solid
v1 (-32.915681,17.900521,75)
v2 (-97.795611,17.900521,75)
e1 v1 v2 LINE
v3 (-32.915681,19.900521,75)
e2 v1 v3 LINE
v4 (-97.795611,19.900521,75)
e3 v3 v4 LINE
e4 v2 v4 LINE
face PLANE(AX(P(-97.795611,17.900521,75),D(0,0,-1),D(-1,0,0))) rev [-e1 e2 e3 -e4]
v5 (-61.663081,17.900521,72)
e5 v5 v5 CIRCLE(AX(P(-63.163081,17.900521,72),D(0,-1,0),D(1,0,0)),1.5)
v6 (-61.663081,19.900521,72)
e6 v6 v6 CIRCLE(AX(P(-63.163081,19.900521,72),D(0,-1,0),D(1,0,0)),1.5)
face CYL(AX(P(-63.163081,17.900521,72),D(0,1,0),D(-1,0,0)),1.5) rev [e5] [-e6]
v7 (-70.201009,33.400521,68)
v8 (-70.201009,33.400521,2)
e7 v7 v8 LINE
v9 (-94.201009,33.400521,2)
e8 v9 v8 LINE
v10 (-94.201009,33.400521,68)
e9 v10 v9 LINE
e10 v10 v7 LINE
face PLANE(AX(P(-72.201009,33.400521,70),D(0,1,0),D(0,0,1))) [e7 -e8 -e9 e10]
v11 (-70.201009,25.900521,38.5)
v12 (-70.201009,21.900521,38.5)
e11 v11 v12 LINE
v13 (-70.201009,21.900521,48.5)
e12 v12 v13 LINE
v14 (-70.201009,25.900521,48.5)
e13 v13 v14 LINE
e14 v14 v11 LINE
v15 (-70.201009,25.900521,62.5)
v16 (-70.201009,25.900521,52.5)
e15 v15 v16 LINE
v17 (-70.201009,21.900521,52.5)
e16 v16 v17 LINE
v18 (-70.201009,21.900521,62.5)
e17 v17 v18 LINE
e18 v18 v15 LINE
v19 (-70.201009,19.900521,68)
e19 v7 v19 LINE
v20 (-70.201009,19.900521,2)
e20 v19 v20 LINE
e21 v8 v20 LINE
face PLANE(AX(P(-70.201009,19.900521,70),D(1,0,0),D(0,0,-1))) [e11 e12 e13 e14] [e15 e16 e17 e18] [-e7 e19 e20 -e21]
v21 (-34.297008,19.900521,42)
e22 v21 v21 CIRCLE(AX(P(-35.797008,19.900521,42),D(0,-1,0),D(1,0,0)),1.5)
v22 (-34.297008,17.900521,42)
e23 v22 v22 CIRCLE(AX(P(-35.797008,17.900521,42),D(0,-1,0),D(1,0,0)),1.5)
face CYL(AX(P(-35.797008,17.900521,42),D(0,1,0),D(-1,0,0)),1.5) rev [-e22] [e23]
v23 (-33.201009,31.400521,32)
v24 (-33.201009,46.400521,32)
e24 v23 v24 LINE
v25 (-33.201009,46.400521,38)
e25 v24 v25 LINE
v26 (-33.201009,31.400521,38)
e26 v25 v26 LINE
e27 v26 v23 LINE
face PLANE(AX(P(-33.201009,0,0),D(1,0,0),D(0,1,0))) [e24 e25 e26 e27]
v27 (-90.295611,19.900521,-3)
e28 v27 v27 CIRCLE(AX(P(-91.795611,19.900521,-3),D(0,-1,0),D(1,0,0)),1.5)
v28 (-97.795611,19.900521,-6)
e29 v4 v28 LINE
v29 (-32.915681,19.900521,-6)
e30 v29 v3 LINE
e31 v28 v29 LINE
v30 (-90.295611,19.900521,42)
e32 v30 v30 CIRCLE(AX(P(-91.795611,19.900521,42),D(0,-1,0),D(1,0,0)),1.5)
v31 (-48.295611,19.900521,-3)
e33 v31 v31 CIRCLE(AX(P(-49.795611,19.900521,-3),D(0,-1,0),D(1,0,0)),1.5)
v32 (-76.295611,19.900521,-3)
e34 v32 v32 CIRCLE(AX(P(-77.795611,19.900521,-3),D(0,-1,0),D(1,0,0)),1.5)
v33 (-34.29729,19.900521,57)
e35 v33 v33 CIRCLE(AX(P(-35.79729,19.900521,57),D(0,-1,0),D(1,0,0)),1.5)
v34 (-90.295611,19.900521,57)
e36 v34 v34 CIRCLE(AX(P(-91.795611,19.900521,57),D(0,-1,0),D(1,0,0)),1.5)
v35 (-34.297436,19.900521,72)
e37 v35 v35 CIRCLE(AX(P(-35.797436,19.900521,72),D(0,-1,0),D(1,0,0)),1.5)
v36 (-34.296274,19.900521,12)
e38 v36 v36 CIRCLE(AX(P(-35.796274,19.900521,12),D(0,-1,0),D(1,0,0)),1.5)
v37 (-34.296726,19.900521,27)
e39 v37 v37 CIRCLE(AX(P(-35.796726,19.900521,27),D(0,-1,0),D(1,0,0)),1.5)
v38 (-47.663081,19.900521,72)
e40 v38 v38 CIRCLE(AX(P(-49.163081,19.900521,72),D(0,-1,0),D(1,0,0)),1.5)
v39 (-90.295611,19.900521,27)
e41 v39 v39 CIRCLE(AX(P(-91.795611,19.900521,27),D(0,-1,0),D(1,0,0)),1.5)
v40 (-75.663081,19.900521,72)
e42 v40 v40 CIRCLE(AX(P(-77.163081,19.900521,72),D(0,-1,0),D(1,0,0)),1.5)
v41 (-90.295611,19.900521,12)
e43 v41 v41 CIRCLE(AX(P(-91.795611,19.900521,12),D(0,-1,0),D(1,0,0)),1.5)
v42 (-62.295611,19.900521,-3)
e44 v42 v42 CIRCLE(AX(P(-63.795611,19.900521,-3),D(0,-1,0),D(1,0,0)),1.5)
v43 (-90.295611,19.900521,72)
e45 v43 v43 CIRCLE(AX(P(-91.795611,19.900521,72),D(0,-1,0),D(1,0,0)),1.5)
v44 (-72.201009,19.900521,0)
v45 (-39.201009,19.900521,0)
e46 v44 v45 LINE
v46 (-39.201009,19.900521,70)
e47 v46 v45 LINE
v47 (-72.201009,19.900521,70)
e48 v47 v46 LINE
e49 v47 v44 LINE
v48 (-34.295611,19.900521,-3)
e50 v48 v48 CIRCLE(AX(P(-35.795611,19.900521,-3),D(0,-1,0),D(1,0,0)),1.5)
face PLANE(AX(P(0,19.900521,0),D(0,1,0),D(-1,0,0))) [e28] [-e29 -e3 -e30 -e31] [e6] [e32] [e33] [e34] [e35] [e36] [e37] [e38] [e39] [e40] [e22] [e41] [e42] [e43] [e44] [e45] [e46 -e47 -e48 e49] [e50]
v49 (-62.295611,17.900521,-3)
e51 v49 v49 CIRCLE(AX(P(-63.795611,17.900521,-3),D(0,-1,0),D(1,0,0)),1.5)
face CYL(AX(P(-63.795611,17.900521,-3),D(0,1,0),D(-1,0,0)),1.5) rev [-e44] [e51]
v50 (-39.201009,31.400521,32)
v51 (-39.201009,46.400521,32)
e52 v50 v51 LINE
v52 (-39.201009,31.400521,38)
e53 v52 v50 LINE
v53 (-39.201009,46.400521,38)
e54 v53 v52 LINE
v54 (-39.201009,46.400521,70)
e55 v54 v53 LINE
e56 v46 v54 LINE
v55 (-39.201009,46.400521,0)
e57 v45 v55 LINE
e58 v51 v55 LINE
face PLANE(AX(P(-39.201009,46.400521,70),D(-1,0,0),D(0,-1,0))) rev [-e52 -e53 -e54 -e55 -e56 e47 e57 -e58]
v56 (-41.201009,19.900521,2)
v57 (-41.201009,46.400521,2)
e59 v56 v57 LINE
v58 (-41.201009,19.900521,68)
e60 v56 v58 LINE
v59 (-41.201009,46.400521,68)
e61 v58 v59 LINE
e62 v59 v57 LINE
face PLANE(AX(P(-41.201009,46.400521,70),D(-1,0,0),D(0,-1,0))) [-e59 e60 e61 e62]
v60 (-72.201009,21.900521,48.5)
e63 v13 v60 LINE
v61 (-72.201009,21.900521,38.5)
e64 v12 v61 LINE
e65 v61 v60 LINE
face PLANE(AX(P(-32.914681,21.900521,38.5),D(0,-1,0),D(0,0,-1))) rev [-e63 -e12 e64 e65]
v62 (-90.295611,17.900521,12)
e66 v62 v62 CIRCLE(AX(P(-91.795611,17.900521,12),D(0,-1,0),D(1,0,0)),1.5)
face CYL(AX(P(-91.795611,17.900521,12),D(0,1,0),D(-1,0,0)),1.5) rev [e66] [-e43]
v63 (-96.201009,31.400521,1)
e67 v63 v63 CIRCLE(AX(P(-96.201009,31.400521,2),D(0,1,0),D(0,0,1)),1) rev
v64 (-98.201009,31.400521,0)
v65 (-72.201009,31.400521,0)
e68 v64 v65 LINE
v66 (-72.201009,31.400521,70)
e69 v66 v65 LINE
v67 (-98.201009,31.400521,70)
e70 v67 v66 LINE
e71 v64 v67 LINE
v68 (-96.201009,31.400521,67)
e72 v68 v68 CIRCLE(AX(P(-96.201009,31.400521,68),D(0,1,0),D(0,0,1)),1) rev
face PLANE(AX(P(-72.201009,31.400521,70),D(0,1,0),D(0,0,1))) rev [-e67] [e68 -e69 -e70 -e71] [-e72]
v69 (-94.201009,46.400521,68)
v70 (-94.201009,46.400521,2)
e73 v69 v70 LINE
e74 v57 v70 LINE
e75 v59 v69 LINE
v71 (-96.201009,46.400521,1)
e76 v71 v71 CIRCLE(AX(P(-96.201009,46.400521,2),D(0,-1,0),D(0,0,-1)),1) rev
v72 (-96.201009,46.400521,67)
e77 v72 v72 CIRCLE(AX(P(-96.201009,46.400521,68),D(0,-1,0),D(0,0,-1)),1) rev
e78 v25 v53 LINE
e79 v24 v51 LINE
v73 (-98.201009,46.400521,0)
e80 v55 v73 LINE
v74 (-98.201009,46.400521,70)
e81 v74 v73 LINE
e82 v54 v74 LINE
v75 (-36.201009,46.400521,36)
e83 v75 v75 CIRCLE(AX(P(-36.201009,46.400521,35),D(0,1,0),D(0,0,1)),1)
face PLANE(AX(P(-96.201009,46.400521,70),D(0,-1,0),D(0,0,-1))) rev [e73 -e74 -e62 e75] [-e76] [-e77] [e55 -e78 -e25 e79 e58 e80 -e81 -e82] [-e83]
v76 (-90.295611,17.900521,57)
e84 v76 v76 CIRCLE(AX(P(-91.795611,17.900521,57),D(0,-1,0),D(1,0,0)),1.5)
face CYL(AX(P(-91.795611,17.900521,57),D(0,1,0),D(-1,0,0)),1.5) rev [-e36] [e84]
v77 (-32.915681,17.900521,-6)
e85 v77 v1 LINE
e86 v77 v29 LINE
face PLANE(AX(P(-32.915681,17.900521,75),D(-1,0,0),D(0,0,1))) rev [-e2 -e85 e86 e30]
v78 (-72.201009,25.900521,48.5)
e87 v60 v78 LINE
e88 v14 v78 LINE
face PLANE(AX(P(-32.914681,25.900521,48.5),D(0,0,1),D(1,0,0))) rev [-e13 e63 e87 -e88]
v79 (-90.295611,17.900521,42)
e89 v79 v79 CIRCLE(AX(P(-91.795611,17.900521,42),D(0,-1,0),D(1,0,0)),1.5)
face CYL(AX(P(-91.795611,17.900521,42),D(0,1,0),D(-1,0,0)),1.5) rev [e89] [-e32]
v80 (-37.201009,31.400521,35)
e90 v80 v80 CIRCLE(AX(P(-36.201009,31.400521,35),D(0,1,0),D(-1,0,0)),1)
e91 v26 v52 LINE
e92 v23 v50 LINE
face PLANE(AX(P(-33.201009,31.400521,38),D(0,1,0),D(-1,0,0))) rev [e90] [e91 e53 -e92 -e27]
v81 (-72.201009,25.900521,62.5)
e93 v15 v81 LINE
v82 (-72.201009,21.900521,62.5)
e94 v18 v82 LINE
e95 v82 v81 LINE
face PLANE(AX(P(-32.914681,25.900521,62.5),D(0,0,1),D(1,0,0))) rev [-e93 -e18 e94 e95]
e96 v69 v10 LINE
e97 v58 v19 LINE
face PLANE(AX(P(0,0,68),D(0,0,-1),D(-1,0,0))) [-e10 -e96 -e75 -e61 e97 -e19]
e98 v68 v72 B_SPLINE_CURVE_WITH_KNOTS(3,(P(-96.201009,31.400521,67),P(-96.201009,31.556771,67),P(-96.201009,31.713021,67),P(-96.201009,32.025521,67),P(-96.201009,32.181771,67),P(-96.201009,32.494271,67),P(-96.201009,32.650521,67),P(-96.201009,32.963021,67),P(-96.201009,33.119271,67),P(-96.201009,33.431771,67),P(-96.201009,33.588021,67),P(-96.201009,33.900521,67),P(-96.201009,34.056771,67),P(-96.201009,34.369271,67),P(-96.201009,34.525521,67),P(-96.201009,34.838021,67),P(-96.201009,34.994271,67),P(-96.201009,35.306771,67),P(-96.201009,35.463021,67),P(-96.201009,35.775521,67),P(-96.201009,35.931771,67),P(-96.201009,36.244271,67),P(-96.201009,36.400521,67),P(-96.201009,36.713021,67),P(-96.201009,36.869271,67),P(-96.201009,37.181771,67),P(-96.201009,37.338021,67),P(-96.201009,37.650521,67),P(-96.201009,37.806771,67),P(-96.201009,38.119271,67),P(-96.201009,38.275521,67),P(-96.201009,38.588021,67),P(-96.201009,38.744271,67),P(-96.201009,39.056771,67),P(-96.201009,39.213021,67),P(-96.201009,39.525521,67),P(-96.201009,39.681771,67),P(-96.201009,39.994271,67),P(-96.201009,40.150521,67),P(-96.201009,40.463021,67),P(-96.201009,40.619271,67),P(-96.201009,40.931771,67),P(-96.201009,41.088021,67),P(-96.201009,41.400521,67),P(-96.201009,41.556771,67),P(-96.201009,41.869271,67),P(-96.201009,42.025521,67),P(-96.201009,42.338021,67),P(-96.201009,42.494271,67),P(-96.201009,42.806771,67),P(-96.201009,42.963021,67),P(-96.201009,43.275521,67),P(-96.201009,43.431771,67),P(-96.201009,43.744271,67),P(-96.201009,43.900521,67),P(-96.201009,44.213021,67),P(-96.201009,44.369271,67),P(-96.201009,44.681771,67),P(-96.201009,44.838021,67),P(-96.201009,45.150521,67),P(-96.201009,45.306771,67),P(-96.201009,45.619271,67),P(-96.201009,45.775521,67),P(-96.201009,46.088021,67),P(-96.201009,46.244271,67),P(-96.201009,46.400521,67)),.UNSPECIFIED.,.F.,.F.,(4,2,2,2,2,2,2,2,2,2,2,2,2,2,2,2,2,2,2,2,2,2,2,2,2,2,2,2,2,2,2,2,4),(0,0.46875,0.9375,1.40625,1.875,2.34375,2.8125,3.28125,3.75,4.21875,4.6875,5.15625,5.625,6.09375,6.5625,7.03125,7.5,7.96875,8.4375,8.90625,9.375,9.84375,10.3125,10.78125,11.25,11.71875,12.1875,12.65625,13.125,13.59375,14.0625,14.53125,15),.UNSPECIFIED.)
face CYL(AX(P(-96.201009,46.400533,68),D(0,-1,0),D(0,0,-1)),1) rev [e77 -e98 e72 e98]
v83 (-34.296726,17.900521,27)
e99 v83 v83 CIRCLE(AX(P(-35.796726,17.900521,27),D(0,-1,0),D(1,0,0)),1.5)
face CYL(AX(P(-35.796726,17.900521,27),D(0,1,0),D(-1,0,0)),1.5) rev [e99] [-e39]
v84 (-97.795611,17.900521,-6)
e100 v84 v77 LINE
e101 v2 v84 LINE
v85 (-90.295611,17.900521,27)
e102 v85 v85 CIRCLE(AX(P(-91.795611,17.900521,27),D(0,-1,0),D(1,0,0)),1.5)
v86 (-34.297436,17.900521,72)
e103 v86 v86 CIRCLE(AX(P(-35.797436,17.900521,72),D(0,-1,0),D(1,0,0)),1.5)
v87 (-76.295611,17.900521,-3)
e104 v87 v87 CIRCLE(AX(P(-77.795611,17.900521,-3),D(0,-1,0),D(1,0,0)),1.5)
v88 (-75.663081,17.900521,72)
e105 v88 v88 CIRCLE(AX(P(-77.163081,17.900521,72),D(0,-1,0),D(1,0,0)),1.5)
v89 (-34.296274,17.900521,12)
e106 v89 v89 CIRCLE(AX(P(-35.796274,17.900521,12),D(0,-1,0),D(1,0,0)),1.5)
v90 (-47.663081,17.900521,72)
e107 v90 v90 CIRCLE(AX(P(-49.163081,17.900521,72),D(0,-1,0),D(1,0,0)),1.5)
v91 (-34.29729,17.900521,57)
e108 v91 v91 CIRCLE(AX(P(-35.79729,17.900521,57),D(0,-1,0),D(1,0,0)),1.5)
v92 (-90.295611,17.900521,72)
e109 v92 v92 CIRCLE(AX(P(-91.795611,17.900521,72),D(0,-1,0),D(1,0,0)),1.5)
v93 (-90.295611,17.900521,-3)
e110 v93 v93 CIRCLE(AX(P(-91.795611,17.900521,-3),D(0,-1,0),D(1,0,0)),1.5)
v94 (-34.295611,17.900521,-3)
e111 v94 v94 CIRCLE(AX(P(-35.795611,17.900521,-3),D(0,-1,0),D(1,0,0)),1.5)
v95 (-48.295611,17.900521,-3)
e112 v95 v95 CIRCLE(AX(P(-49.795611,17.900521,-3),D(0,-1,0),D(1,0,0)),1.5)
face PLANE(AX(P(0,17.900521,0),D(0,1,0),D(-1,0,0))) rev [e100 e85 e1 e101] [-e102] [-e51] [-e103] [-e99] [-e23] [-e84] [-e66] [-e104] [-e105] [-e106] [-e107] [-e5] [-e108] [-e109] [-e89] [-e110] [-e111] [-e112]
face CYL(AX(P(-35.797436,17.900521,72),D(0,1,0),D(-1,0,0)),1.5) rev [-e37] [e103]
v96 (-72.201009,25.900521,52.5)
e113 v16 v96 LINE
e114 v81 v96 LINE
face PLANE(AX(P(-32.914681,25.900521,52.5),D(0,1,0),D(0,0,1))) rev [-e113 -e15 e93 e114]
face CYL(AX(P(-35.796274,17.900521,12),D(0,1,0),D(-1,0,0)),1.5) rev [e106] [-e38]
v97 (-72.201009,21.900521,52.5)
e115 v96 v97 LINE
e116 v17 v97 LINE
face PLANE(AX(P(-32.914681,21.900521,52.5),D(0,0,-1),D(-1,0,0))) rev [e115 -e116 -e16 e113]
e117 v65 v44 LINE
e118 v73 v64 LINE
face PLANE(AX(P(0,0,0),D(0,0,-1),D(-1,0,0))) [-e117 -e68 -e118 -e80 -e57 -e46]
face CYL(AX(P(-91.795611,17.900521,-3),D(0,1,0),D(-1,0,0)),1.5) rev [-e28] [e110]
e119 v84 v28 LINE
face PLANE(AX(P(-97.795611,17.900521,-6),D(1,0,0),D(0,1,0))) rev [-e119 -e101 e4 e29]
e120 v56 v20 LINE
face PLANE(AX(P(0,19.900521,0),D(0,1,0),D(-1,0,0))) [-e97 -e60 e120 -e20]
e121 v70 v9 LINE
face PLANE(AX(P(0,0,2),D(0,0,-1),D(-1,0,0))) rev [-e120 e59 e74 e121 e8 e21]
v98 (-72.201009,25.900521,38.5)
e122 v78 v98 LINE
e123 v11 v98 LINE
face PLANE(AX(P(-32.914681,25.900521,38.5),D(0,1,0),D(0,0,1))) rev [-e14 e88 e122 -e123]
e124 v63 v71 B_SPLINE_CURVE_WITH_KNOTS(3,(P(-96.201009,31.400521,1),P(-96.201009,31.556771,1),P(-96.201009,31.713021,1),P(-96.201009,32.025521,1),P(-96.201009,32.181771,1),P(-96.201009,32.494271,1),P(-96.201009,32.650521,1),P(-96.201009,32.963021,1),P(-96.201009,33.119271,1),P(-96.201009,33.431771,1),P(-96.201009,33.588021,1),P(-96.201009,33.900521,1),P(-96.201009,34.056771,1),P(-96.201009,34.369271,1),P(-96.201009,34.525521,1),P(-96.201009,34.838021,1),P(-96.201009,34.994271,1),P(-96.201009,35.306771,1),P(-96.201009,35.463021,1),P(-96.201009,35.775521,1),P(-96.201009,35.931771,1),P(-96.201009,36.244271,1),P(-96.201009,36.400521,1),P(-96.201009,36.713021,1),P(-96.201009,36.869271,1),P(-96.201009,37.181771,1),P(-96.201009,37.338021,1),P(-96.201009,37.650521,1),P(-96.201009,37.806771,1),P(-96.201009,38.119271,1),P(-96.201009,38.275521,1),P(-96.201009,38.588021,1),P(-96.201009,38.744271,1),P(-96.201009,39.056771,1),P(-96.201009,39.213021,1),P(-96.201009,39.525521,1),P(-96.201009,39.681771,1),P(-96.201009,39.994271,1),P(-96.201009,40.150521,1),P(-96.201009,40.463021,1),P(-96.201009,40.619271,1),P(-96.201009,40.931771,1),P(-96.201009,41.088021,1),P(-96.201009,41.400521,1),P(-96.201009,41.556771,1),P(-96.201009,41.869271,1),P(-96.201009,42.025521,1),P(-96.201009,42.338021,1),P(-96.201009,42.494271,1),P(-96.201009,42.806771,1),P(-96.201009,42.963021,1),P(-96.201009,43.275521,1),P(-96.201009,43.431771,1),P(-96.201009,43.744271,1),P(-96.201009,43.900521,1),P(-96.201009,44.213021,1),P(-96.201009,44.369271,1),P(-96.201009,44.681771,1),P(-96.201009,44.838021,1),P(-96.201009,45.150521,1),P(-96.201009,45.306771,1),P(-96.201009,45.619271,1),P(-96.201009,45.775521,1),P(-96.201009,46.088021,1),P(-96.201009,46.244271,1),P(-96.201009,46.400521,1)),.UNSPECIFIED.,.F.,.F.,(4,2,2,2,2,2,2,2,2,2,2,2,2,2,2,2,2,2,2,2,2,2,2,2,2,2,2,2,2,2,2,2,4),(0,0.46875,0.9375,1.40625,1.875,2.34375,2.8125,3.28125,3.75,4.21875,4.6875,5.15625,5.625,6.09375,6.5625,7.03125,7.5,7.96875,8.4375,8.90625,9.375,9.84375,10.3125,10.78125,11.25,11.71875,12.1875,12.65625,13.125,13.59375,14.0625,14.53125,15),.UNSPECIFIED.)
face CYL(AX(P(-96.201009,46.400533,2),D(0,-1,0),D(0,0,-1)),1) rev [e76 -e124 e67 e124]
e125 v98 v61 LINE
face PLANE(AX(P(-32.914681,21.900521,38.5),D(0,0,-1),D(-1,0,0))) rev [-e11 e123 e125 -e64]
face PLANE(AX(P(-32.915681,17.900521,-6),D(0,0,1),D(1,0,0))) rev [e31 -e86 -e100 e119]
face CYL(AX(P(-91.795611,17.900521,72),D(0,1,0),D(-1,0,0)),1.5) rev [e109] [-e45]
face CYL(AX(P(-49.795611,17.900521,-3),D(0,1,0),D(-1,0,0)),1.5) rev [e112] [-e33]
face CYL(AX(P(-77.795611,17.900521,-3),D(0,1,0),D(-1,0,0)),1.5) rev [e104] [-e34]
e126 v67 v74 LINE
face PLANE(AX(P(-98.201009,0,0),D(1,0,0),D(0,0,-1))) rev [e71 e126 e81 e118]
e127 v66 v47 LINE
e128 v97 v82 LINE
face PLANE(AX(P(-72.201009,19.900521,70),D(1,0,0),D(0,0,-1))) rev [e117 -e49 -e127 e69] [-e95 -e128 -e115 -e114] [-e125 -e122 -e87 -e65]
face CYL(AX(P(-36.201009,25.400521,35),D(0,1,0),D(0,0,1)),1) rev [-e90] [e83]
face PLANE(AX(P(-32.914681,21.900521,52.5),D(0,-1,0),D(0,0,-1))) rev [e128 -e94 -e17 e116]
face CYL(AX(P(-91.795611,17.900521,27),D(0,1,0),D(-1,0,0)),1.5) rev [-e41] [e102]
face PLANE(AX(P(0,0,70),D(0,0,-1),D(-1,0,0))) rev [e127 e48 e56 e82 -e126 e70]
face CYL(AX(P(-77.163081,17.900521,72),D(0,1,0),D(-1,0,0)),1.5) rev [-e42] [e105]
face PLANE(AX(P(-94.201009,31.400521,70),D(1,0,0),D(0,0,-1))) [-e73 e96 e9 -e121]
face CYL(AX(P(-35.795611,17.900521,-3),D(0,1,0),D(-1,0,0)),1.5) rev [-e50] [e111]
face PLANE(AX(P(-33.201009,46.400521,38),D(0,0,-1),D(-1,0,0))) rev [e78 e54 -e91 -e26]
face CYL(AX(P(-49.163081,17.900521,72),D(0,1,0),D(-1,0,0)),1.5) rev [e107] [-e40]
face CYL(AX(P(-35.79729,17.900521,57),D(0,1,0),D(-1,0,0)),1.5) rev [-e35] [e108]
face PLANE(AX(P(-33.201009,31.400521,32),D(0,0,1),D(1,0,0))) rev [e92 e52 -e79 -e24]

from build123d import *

# Parameters (mm, degrees)
BOSS_EXTRU_1_DEPTH                  = 70
ESQUISSE2_W                         = 64.879929842
ESQUISSE2_H                         = 80.999999972
ESQUISSE2_R                         = 1.499999992
ESQUISSE2_R_2                       = 1.499999996
ESQUISSE2_R_3                       = 1.499999991
ESQUISSE2_R_4                       = 1.499999993
ESQUISSE2_R_5                       = 1.499999999
ESQUISSE2_R_6                       = 1.5
BOSS_EXTRU_2_DEPTH                  = 2
COQUE1_START                        = 19.900521193
COQUE1_OUTLINE_W                    = 29
COQUE1_OUTLINE_H                    = 66
COQUE1_DEPTH                        = 26.5
COQUE1_START_2                      = 33.400521193
COQUE1_2_OUTLINE_W                  = 24
COQUE1_2_OUTLINE_H                  = 66
COQUE1_2_DEPTH                      = 13
ENL_V_MAT_EXTRU_1_REACH             = 98.547
ESQUISSE4_W                         = 10
ESQUISSE4_H                         = 4
ENL_V_MAT_EXTRU_2_REACH             = 98.547
ESQUISSE5_W                         = 10
ESQUISSE5_H                         = 4
ESQUISSE8_W                         = 70
ESQUISSE8_H                         = 15
BOSS_EXTRU_4_DEPTH                  = 2
ENL_V_MAT_EXTRU_4_REACH             = 128.81
ESQUISSE9_R                         = 1
ENL_V_MAT_EXTRU_4_DIRECTION_2_DEPTH = 127.809653192
ESQUISSE10_W                        = 6
ESQUISSE10_H                        = 15
BOSS_EXTRU_5_DEPTH                  = 6
ESQUISSE11_R                        = 1
ENL_V_MAT_EXTRU_5_DEPTH             = 21


# Read off the part's stored shape, not the designer's step: Coque1
with BuildPart() as part:
    # Esquisse1 → Boss.-Extru.1 (new body)
    with BuildSketch(Plane.XY):
        Polygon((-96.201008889, 46.400521193), (-39.201008889, 46.400521193), (-39.201008889, 19.900521193), (-72.201008889, 19.900521193), (-72.201008889, 31.400521193), (-96.201008889, 31.400521193), align=None)
    extrude(amount=BOSS_EXTRU_1_DEPTH)

    # Esquisse2 → Boss.-Extru.2 (add)
    with BuildSketch(Plane(origin=(0, 19.900521193, 0), x_dir=(-1, 0, 0), z_dir=(0, -1, 0))):
        with Locations((65.355645606, -34.499999986)):
            Rectangle(ESQUISSE2_W, ESQUISSE2_H)
        with Locations(Location((35.797436273, -71.999999972, 0), (0, 0, 180))):
            Circle(ESQUISSE2_R, mode=Mode.SUBTRACT)
        with Locations(Location((35.797290063, -56.999999973, 0), (0, 0, 180))):
            Circle(ESQUISSE2_R_2, mode=Mode.SUBTRACT)
        with Locations(Location((35.797008085, -41.999999976, 0), (0, 0, 180))):
            Circle(ESQUISSE2_R_3, mode=Mode.SUBTRACT)
        with Locations(Location((35.796726108, -26.999999979, 0), (0, 0, 180))):
            Circle(ESQUISSE2_R_4, mode=Mode.SUBTRACT)
        with Locations(Location((35.796274405, -11.999999985, 0), (0, 0, 180))):
            Circle(ESQUISSE2_R_5, mode=Mode.SUBTRACT)
        with Locations(Location((35.795610527, 3, 0), (0, 0, 180))):
            Circle(ESQUISSE2_R_6, mode=Mode.SUBTRACT)
        with Locations(Location((49.795610527, 3, 0), (0, 0, 180))):
            Circle(ESQUISSE2_R_6, mode=Mode.SUBTRACT)
        with Locations(Location((63.795610527, 3, 0), (0, 0, 180))):
            Circle(ESQUISSE2_R_6, mode=Mode.SUBTRACT)
        with Locations(Location((77.795610527, 3, 0), (0, 0, 180))):
            Circle(ESQUISSE2_R_6, mode=Mode.SUBTRACT)
        with Locations(Location((91.795610527, 3, 0), (0, 0, 180))):
            Circle(ESQUISSE2_R_6, mode=Mode.SUBTRACT)
        with Locations(Location((91.795610527, -12, 0), (0, 0, 180))):
            Circle(ESQUISSE2_R_6, mode=Mode.SUBTRACT)
        with Locations(Location((91.795610527, -27, 0), (0, 0, 180))):
            Circle(ESQUISSE2_R_6, mode=Mode.SUBTRACT)
        with Locations(Location((91.795610527, -42, 0), (0, 0, 180))):
            Circle(ESQUISSE2_R_6, mode=Mode.SUBTRACT)
        with Locations(Location((91.795610527, -57, 0), (0, 0, 180))):
            Circle(ESQUISSE2_R_6, mode=Mode.SUBTRACT)
        with Locations(Location((91.795610527, -72, 0), (0, 0, 180))):
            Circle(ESQUISSE2_R_6, mode=Mode.SUBTRACT)
        with Locations(Location((49.163080617, -71.999999972, 0), (0, 0, 180))):
            Circle(ESQUISSE2_R, mode=Mode.SUBTRACT)
        with Locations(Location((63.163080617, -71.999999972, 0), (0, 0, 180))):
            Circle(ESQUISSE2_R, mode=Mode.SUBTRACT)
        with Locations(Location((77.163080617, -71.999999972, 0), (0, 0, 180))):
            Circle(ESQUISSE2_R, mode=Mode.SUBTRACT)
    extrude(amount=BOSS_EXTRU_2_DEPTH)

    # Coque1 outline → Coque1 (cut)
    with BuildSketch(Plane(origin=(0, 0, 0), x_dir=(1, 0, 0), z_dir=(0, 1, 0)).offset(COQUE1_START)):
        with Locations((-55.701008889, -35)):
            Rectangle(COQUE1_OUTLINE_W, COQUE1_OUTLINE_H)
    extrude(amount=COQUE1_DEPTH, mode=Mode.SUBTRACT)

    # Coque1 2 outline → Coque1 2 (cut)
    with BuildSketch(Plane(origin=(0, 0, 0), x_dir=(1, 0, 0), z_dir=(0, 1, 0)).offset(COQUE1_START_2)):
        with Locations((-82.201008889, -35)):
            Rectangle(COQUE1_2_OUTLINE_W, COQUE1_2_OUTLINE_H)
    extrude(amount=COQUE1_2_DEPTH, mode=Mode.SUBTRACT)

    # Esquisse4 → Enlèv. mat.-Extru.1 (cut, up to next)
    with BuildSketch(Plane.ZY.offset(72.201008889), mode=Mode.PRIVATE) as enl_v_mat_extru_1_sk1:
        with Locations((57.5, 23.900521193)):
            Rectangle(ESQUISSE4_W, ESQUISSE4_H)
    enl_v_mat_extru_1_tool1 = extrude(enl_v_mat_extru_1_sk1.sketch, amount=-ENL_V_MAT_EXTRU_1_REACH, mode=Mode.PRIVATE) & part.part
    add(enl_v_mat_extru_1_tool1.solids().sort_by_distance((-72.201009, 23.900521, 57.5))[0], mode=Mode.SUBTRACT)

    # Esquisse5 → Enlèv. mat.-Extru.2 (cut, up to next)
    with BuildSketch(Plane.ZY.offset(72.201008889), mode=Mode.PRIVATE) as enl_v_mat_extru_2_sk1:
        with Locations((43.5, 23.900521193)):
            Rectangle(ESQUISSE5_W, ESQUISSE5_H)
    enl_v_mat_extru_2_tool1 = extrude(enl_v_mat_extru_2_sk1.sketch, amount=-ENL_V_MAT_EXTRU_2_REACH, mode=Mode.PRIVATE) & part.part
    add(enl_v_mat_extru_2_tool1.solids().sort_by_distance((-72.201009, 23.900521, 43.5))[0], mode=Mode.SUBTRACT)

    # Esquisse8 → Boss.-Extru.4 (add)
    with BuildSketch(Plane.ZY.offset(96.201008889)):
        with Locations((35, 38.900521193)):
            Rectangle(ESQUISSE8_W, ESQUISSE8_H)
    extrude(amount=BOSS_EXTRU_4_DEPTH)

    # Esquisse9 → Enlèv. mat.-Extru.4 (cut, up to next)
    with BuildSketch(Plane(origin=(0, 46.400521193, 0), x_dir=(1, 0, 0), z_dir=(0, 1, 0)), mode=Mode.PRIVATE) as enl_v_mat_extru_4_sk1:
        with Locations(Location((-96.201008889, -2, 0), (0, 0, 90))):
            Circle(ESQUISSE9_R)
    enl_v_mat_extru_4_tool1 = extrude(enl_v_mat_extru_4_sk1.sketch, amount=-ENL_V_MAT_EXTRU_4_REACH, mode=Mode.PRIVATE) & part.part
    # Esquisse9 → Enlèv. mat.-Extru.4 (cut, up to next)
    with BuildSketch(Plane(origin=(0, 46.400521193, 0), x_dir=(1, 0, 0), z_dir=(0, 1, 0)), mode=Mode.PRIVATE) as enl_v_mat_extru_4_sk2:
        with Locations(Location((-96.201008889, -68, 0), (0, 0, 90))):
            Circle(ESQUISSE9_R)
    enl_v_mat_extru_4_tool2 = extrude(enl_v_mat_extru_4_sk2.sketch, amount=-ENL_V_MAT_EXTRU_4_REACH, mode=Mode.PRIVATE) & part.part
    add(enl_v_mat_extru_4_tool1.solids().sort_by_distance((-96.201009, 46.400521, 2))[0], mode=Mode.SUBTRACT)
    add(enl_v_mat_extru_4_tool2.solids().sort_by_distance((-96.201009, 46.400521, 68))[0], mode=Mode.SUBTRACT)

    # Esquisse9 → Enlèv. mat.-Extru.4 direction 2 (cut)
    with BuildSketch(Plane(origin=(0, 46.400521193, 0), x_dir=(1, 0, 0), z_dir=(0, 1, 0))):
        with Locations(Location((-96.201008889, -2, 0), (0, 0, 90))):
            Circle(ESQUISSE9_R)
        with Locations(Location((-96.201008889, -68, 0), (0, 0, 90))):
            Circle(ESQUISSE9_R)
    extrude(amount=ENL_V_MAT_EXTRU_4_DIRECTION_2_DEPTH, mode=Mode.SUBTRACT)

    # Esquisse10 → Boss.-Extru.5 (add)
    with BuildSketch(Plane(origin=(-39.201008889, 0, 0), x_dir=(0, 0, -1), z_dir=(1, 0, 0))):
        with Locations((-35, 38.900521193)):
            Rectangle(ESQUISSE10_W, ESQUISSE10_H)
    extrude(amount=BOSS_EXTRU_5_DEPTH)

    # Esquisse11 → Enlèv. mat.-Extru.5 (cut)
    with BuildSketch(Plane(origin=(0, 46.400521193, 0), x_dir=(1, 0, 0), z_dir=(0, 1, 0))):
        with Locations(Location((-36.201008889, -35, 0), (0, 0, 270))):
            Circle(ESQUISSE11_R)
    extrude(amount=-ENL_V_MAT_EXTRU_5_DEPTH, mode=Mode.SUBTRACT)


solid = part.part
